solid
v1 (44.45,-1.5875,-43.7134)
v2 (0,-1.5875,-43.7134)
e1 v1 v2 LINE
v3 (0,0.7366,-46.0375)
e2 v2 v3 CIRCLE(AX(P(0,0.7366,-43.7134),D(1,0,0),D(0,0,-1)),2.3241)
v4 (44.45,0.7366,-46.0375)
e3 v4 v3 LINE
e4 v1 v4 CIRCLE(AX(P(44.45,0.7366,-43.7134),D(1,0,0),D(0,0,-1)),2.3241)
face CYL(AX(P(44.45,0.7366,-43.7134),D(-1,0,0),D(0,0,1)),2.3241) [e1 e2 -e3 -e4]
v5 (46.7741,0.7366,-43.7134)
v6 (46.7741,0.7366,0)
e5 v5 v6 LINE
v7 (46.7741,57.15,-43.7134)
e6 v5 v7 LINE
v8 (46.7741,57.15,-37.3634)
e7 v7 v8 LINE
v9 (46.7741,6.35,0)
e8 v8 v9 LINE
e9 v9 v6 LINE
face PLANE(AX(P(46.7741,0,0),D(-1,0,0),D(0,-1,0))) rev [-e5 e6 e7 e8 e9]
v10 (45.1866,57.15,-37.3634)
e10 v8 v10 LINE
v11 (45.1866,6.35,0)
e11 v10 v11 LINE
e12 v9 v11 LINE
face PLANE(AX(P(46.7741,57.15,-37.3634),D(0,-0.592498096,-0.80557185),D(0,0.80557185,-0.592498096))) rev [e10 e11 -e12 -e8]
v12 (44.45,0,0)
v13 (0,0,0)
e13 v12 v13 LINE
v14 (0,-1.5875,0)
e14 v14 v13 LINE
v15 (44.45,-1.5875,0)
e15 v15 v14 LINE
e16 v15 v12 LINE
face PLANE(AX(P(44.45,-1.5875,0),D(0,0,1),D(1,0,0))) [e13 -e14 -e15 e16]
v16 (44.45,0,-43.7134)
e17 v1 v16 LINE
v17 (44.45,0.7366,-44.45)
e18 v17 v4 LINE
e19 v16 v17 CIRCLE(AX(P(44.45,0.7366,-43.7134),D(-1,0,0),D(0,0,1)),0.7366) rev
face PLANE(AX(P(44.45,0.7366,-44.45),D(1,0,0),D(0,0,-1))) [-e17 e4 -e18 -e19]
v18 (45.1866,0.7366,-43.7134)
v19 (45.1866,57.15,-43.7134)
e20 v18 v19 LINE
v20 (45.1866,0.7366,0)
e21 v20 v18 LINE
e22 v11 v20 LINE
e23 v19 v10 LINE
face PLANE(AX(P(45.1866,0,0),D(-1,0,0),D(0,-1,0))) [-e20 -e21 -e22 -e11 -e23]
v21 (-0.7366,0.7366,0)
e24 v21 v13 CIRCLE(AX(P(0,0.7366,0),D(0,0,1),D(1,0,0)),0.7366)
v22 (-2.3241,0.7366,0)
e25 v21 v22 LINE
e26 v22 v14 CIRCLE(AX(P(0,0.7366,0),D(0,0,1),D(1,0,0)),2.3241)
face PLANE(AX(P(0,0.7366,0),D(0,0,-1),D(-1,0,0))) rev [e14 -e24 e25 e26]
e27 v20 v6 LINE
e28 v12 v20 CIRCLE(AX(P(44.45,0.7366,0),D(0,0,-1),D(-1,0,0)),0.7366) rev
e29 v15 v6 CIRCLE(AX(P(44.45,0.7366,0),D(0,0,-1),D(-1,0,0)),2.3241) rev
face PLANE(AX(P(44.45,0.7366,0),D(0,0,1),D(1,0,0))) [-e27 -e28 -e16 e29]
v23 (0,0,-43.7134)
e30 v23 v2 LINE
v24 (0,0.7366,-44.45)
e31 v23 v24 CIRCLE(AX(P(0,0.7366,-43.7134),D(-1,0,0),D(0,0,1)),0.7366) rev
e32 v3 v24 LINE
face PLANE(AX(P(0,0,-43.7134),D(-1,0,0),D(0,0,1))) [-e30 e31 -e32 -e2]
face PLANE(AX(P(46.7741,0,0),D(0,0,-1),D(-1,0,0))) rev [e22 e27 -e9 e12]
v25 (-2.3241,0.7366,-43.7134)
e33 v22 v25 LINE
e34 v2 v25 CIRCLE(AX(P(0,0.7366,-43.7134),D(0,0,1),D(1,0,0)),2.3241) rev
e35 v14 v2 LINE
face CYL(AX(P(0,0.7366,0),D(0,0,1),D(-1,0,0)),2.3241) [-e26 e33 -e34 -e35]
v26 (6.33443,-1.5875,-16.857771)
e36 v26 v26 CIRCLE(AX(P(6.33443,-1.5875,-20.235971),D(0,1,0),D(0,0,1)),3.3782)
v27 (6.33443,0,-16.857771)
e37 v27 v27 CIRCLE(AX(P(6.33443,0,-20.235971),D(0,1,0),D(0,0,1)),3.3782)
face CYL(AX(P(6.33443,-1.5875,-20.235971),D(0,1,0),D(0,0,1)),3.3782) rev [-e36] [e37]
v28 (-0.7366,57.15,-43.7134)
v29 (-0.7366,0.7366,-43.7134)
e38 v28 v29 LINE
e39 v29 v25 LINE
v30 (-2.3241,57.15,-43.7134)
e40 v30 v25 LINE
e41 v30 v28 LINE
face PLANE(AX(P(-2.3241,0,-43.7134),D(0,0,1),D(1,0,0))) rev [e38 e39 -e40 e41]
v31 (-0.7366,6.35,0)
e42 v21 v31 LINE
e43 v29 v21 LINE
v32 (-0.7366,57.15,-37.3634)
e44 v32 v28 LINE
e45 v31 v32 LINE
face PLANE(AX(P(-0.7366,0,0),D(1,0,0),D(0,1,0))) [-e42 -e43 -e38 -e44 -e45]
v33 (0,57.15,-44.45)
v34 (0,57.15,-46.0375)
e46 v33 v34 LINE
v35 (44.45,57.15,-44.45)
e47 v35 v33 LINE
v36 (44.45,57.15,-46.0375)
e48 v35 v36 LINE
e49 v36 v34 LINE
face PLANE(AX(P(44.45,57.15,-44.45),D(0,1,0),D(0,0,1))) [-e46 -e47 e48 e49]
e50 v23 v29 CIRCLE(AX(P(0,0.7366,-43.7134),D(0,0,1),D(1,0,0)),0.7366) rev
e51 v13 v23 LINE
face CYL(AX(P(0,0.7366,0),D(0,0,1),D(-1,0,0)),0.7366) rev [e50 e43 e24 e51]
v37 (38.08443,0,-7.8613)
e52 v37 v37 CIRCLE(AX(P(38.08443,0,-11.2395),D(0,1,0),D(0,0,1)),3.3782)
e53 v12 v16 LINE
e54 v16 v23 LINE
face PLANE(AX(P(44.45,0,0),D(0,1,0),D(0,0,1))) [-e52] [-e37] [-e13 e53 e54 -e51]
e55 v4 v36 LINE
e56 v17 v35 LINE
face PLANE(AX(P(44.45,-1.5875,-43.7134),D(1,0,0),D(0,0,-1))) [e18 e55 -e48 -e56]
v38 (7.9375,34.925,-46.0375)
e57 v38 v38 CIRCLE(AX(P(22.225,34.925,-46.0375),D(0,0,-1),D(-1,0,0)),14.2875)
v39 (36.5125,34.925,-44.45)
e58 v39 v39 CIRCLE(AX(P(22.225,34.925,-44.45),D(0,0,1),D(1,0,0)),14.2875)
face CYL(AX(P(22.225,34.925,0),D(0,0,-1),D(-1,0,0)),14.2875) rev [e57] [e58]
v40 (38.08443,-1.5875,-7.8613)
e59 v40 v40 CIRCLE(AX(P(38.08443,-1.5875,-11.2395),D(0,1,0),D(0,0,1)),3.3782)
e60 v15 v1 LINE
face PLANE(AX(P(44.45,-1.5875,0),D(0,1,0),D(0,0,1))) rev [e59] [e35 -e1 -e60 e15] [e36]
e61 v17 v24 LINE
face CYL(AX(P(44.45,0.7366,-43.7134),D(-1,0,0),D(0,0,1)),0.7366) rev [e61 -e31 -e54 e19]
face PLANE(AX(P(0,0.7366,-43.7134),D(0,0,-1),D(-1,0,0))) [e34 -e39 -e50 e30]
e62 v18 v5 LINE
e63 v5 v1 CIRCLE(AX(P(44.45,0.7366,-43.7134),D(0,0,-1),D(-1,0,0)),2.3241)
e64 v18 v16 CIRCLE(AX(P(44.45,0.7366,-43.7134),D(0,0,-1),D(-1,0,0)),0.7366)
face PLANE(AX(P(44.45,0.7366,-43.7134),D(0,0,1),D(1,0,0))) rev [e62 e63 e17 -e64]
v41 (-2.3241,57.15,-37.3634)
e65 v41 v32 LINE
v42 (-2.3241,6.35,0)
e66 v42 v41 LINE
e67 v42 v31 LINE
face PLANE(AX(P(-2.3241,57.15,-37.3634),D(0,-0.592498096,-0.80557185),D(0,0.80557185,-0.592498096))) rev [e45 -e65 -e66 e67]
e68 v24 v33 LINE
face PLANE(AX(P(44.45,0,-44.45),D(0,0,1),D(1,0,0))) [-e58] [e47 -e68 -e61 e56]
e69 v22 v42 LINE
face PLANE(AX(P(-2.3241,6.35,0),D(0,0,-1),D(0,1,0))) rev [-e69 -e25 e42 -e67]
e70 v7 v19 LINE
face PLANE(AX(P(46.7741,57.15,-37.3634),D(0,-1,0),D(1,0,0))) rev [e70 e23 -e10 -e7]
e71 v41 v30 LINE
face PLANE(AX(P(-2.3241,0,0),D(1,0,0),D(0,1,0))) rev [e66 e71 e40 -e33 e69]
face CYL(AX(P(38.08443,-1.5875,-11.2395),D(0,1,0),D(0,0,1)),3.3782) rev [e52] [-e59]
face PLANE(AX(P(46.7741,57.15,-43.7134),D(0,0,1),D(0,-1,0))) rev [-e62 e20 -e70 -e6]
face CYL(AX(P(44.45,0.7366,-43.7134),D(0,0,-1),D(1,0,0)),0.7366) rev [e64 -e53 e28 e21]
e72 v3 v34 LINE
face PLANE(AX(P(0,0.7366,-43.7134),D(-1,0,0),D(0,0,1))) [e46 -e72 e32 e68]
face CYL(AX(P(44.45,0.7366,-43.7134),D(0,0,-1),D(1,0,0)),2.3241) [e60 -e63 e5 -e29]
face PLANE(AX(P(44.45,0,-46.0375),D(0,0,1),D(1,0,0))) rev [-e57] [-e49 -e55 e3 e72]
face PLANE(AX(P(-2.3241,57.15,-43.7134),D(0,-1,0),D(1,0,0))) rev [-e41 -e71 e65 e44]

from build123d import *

# Parameters (mm, degrees)
BASE_FLANGE1_DEPTH        = 44.45
EDGE_FLANGE1_DEPTH        = 43.7134
EDGE_FLANGE1_START        = 1.5875
EDGE_FLANGE1_FLAT_DEPTH   = 1.5875
EDGE_FLANGE1_BEND_DEPTH   = 43.7134
EDGE_FLANGE1_FLAT_2_DEPTH = 1.5875
SKETCH12_R                = 14.2875
CUT_EXTRUDE1_DEPTH        = 88.025228164
SKETCH13_R                = 3.3782
CUT_EXTRUDE2_DEPTH        = 88.025228164


# Sheet-metal steps are written as plain solids
with BuildPart() as part:
    # Sketch1 → Base-Flange1 (new body)
    with BuildSketch(Plane(origin=(0, 0, 0), x_dir=(0, 0, -1), z_dir=(1, 0, 0))):
        with BuildLine():
            Line((0, 0), (43.7134, 0))
            ThreePointArc((43.7134, 0), (44.234254855, 0.215745145), (44.45, 0.7366))
            Line((44.45, 0.7366), (44.45, 57.15))
            Line((44.45, 57.15), (46.0375, 57.15))
            Line((46.0375, 57.15), (46.0375, 0.7366))
            ThreePointArc((46.0375, 0.7366), (45.35678687, -0.90678687), (43.7134, -1.5875))
            Line((43.7134, -1.5875), (0, -1.5875))
            Line((0, -1.5875), (0, 0))
        make_face()
    extrude(amount=BASE_FLANGE1_DEPTH)

    # Edge-Flange1 bend section (across the edge) → Edge-Flange1 (add)
    with BuildSketch(Plane(origin=(-0.7366, 0, -43.7134), x_dir=(1, 0, 0), z_dir=(0, 0, 1))):
        with BuildLine():
            Line((-1.5875, 0.7366), (0, 0.7366))
            ThreePointArc((0, 0.7366), (0.215745145, 0.215745145), (0.7366, 0))
            Line((0.7366, 0), (0.7366, -1.5875))
            ThreePointArc((0.7366, -1.5875), (-0.90678687, -0.90678687), (-1.5875, 0.7366))
        make_face()
    extrude(amount=EDGE_FLANGE1_DEPTH)

    # Edge-Flange1 profile (on flange) → Edge-Flange1 flat (add)
    with BuildSketch(Plane.ZY.offset(0.7366).offset(EDGE_FLANGE1_START)):
        Polygon((0, 0.7366), (0, 6.35), (-37.3634, 57.15), (-43.7134, 57.15), (-43.7134, 0.7366), align=None)
    extrude(amount=-EDGE_FLANGE1_FLAT_DEPTH)

    # Edge-Flange1 bend section 2 (across the edge) → Edge-Flange1 bend (add)
    with BuildSketch(Plane(origin=(45.1866, 0, 0), x_dir=(-1, 0, 0), z_dir=(0, 0, -1))):
        with BuildLine():
            Line((-1.5875, 0.7366), (0, 0.7366))
            ThreePointArc((0, 0.7366), (0.215745145, 0.215745145), (0.7366, 0))
            Line((0.7366, 0), (0.7366, -1.5875))
            ThreePointArc((0.7366, -1.5875), (-0.90678687, -0.90678687), (-1.5875, 0.7366))
        make_face()
    extrude(amount=EDGE_FLANGE1_BEND_DEPTH)

    # Edge-Flange1 profile 2 (on flange) → Edge-Flange1 flat 2 (add)
    with BuildSketch(Plane(origin=(45.1866, 0, 0), x_dir=(0, 0, -1), z_dir=(1, 0, 0)).offset(EDGE_FLANGE1_START)):
        Polygon((0, 6.35), (0, 0.7366), (43.7134, 0.7366), (43.7134, 57.15), (37.3634, 57.15), align=None)
    extrude(amount=-EDGE_FLANGE1_FLAT_2_DEPTH)

    # Sketch12 → Cut-Extrude1 (cut, through all)
    with BuildSketch(Plane(origin=(0, 0, -46.0375), x_dir=(-1, 0, 0), z_dir=(0, 0, -1))):
        with Locations((-22.225, 34.925)):
            Circle(SKETCH12_R)
    extrude(amount=-CUT_EXTRUDE1_DEPTH, mode=Mode.SUBTRACT)

    # Sketch13 → Cut-Extrude2 (cut, through all)
    with BuildSketch(Plane(origin=(0, 0, 0), x_dir=(1, 0, 0), z_dir=(0, 1, 0))):
        with Locations(Location((38.0844298, 11.2395, 0), (0, 0, 270))):
            Circle(SKETCH13_R)
        with Locations(Location((6.3344298, 20.235970884, 0), (0, 0, 270))):
            Circle(SKETCH13_R)
    extrude(amount=-CUT_EXTRUDE2_DEPTH, mode=Mode.SUBTRACT)


solid = part.part
